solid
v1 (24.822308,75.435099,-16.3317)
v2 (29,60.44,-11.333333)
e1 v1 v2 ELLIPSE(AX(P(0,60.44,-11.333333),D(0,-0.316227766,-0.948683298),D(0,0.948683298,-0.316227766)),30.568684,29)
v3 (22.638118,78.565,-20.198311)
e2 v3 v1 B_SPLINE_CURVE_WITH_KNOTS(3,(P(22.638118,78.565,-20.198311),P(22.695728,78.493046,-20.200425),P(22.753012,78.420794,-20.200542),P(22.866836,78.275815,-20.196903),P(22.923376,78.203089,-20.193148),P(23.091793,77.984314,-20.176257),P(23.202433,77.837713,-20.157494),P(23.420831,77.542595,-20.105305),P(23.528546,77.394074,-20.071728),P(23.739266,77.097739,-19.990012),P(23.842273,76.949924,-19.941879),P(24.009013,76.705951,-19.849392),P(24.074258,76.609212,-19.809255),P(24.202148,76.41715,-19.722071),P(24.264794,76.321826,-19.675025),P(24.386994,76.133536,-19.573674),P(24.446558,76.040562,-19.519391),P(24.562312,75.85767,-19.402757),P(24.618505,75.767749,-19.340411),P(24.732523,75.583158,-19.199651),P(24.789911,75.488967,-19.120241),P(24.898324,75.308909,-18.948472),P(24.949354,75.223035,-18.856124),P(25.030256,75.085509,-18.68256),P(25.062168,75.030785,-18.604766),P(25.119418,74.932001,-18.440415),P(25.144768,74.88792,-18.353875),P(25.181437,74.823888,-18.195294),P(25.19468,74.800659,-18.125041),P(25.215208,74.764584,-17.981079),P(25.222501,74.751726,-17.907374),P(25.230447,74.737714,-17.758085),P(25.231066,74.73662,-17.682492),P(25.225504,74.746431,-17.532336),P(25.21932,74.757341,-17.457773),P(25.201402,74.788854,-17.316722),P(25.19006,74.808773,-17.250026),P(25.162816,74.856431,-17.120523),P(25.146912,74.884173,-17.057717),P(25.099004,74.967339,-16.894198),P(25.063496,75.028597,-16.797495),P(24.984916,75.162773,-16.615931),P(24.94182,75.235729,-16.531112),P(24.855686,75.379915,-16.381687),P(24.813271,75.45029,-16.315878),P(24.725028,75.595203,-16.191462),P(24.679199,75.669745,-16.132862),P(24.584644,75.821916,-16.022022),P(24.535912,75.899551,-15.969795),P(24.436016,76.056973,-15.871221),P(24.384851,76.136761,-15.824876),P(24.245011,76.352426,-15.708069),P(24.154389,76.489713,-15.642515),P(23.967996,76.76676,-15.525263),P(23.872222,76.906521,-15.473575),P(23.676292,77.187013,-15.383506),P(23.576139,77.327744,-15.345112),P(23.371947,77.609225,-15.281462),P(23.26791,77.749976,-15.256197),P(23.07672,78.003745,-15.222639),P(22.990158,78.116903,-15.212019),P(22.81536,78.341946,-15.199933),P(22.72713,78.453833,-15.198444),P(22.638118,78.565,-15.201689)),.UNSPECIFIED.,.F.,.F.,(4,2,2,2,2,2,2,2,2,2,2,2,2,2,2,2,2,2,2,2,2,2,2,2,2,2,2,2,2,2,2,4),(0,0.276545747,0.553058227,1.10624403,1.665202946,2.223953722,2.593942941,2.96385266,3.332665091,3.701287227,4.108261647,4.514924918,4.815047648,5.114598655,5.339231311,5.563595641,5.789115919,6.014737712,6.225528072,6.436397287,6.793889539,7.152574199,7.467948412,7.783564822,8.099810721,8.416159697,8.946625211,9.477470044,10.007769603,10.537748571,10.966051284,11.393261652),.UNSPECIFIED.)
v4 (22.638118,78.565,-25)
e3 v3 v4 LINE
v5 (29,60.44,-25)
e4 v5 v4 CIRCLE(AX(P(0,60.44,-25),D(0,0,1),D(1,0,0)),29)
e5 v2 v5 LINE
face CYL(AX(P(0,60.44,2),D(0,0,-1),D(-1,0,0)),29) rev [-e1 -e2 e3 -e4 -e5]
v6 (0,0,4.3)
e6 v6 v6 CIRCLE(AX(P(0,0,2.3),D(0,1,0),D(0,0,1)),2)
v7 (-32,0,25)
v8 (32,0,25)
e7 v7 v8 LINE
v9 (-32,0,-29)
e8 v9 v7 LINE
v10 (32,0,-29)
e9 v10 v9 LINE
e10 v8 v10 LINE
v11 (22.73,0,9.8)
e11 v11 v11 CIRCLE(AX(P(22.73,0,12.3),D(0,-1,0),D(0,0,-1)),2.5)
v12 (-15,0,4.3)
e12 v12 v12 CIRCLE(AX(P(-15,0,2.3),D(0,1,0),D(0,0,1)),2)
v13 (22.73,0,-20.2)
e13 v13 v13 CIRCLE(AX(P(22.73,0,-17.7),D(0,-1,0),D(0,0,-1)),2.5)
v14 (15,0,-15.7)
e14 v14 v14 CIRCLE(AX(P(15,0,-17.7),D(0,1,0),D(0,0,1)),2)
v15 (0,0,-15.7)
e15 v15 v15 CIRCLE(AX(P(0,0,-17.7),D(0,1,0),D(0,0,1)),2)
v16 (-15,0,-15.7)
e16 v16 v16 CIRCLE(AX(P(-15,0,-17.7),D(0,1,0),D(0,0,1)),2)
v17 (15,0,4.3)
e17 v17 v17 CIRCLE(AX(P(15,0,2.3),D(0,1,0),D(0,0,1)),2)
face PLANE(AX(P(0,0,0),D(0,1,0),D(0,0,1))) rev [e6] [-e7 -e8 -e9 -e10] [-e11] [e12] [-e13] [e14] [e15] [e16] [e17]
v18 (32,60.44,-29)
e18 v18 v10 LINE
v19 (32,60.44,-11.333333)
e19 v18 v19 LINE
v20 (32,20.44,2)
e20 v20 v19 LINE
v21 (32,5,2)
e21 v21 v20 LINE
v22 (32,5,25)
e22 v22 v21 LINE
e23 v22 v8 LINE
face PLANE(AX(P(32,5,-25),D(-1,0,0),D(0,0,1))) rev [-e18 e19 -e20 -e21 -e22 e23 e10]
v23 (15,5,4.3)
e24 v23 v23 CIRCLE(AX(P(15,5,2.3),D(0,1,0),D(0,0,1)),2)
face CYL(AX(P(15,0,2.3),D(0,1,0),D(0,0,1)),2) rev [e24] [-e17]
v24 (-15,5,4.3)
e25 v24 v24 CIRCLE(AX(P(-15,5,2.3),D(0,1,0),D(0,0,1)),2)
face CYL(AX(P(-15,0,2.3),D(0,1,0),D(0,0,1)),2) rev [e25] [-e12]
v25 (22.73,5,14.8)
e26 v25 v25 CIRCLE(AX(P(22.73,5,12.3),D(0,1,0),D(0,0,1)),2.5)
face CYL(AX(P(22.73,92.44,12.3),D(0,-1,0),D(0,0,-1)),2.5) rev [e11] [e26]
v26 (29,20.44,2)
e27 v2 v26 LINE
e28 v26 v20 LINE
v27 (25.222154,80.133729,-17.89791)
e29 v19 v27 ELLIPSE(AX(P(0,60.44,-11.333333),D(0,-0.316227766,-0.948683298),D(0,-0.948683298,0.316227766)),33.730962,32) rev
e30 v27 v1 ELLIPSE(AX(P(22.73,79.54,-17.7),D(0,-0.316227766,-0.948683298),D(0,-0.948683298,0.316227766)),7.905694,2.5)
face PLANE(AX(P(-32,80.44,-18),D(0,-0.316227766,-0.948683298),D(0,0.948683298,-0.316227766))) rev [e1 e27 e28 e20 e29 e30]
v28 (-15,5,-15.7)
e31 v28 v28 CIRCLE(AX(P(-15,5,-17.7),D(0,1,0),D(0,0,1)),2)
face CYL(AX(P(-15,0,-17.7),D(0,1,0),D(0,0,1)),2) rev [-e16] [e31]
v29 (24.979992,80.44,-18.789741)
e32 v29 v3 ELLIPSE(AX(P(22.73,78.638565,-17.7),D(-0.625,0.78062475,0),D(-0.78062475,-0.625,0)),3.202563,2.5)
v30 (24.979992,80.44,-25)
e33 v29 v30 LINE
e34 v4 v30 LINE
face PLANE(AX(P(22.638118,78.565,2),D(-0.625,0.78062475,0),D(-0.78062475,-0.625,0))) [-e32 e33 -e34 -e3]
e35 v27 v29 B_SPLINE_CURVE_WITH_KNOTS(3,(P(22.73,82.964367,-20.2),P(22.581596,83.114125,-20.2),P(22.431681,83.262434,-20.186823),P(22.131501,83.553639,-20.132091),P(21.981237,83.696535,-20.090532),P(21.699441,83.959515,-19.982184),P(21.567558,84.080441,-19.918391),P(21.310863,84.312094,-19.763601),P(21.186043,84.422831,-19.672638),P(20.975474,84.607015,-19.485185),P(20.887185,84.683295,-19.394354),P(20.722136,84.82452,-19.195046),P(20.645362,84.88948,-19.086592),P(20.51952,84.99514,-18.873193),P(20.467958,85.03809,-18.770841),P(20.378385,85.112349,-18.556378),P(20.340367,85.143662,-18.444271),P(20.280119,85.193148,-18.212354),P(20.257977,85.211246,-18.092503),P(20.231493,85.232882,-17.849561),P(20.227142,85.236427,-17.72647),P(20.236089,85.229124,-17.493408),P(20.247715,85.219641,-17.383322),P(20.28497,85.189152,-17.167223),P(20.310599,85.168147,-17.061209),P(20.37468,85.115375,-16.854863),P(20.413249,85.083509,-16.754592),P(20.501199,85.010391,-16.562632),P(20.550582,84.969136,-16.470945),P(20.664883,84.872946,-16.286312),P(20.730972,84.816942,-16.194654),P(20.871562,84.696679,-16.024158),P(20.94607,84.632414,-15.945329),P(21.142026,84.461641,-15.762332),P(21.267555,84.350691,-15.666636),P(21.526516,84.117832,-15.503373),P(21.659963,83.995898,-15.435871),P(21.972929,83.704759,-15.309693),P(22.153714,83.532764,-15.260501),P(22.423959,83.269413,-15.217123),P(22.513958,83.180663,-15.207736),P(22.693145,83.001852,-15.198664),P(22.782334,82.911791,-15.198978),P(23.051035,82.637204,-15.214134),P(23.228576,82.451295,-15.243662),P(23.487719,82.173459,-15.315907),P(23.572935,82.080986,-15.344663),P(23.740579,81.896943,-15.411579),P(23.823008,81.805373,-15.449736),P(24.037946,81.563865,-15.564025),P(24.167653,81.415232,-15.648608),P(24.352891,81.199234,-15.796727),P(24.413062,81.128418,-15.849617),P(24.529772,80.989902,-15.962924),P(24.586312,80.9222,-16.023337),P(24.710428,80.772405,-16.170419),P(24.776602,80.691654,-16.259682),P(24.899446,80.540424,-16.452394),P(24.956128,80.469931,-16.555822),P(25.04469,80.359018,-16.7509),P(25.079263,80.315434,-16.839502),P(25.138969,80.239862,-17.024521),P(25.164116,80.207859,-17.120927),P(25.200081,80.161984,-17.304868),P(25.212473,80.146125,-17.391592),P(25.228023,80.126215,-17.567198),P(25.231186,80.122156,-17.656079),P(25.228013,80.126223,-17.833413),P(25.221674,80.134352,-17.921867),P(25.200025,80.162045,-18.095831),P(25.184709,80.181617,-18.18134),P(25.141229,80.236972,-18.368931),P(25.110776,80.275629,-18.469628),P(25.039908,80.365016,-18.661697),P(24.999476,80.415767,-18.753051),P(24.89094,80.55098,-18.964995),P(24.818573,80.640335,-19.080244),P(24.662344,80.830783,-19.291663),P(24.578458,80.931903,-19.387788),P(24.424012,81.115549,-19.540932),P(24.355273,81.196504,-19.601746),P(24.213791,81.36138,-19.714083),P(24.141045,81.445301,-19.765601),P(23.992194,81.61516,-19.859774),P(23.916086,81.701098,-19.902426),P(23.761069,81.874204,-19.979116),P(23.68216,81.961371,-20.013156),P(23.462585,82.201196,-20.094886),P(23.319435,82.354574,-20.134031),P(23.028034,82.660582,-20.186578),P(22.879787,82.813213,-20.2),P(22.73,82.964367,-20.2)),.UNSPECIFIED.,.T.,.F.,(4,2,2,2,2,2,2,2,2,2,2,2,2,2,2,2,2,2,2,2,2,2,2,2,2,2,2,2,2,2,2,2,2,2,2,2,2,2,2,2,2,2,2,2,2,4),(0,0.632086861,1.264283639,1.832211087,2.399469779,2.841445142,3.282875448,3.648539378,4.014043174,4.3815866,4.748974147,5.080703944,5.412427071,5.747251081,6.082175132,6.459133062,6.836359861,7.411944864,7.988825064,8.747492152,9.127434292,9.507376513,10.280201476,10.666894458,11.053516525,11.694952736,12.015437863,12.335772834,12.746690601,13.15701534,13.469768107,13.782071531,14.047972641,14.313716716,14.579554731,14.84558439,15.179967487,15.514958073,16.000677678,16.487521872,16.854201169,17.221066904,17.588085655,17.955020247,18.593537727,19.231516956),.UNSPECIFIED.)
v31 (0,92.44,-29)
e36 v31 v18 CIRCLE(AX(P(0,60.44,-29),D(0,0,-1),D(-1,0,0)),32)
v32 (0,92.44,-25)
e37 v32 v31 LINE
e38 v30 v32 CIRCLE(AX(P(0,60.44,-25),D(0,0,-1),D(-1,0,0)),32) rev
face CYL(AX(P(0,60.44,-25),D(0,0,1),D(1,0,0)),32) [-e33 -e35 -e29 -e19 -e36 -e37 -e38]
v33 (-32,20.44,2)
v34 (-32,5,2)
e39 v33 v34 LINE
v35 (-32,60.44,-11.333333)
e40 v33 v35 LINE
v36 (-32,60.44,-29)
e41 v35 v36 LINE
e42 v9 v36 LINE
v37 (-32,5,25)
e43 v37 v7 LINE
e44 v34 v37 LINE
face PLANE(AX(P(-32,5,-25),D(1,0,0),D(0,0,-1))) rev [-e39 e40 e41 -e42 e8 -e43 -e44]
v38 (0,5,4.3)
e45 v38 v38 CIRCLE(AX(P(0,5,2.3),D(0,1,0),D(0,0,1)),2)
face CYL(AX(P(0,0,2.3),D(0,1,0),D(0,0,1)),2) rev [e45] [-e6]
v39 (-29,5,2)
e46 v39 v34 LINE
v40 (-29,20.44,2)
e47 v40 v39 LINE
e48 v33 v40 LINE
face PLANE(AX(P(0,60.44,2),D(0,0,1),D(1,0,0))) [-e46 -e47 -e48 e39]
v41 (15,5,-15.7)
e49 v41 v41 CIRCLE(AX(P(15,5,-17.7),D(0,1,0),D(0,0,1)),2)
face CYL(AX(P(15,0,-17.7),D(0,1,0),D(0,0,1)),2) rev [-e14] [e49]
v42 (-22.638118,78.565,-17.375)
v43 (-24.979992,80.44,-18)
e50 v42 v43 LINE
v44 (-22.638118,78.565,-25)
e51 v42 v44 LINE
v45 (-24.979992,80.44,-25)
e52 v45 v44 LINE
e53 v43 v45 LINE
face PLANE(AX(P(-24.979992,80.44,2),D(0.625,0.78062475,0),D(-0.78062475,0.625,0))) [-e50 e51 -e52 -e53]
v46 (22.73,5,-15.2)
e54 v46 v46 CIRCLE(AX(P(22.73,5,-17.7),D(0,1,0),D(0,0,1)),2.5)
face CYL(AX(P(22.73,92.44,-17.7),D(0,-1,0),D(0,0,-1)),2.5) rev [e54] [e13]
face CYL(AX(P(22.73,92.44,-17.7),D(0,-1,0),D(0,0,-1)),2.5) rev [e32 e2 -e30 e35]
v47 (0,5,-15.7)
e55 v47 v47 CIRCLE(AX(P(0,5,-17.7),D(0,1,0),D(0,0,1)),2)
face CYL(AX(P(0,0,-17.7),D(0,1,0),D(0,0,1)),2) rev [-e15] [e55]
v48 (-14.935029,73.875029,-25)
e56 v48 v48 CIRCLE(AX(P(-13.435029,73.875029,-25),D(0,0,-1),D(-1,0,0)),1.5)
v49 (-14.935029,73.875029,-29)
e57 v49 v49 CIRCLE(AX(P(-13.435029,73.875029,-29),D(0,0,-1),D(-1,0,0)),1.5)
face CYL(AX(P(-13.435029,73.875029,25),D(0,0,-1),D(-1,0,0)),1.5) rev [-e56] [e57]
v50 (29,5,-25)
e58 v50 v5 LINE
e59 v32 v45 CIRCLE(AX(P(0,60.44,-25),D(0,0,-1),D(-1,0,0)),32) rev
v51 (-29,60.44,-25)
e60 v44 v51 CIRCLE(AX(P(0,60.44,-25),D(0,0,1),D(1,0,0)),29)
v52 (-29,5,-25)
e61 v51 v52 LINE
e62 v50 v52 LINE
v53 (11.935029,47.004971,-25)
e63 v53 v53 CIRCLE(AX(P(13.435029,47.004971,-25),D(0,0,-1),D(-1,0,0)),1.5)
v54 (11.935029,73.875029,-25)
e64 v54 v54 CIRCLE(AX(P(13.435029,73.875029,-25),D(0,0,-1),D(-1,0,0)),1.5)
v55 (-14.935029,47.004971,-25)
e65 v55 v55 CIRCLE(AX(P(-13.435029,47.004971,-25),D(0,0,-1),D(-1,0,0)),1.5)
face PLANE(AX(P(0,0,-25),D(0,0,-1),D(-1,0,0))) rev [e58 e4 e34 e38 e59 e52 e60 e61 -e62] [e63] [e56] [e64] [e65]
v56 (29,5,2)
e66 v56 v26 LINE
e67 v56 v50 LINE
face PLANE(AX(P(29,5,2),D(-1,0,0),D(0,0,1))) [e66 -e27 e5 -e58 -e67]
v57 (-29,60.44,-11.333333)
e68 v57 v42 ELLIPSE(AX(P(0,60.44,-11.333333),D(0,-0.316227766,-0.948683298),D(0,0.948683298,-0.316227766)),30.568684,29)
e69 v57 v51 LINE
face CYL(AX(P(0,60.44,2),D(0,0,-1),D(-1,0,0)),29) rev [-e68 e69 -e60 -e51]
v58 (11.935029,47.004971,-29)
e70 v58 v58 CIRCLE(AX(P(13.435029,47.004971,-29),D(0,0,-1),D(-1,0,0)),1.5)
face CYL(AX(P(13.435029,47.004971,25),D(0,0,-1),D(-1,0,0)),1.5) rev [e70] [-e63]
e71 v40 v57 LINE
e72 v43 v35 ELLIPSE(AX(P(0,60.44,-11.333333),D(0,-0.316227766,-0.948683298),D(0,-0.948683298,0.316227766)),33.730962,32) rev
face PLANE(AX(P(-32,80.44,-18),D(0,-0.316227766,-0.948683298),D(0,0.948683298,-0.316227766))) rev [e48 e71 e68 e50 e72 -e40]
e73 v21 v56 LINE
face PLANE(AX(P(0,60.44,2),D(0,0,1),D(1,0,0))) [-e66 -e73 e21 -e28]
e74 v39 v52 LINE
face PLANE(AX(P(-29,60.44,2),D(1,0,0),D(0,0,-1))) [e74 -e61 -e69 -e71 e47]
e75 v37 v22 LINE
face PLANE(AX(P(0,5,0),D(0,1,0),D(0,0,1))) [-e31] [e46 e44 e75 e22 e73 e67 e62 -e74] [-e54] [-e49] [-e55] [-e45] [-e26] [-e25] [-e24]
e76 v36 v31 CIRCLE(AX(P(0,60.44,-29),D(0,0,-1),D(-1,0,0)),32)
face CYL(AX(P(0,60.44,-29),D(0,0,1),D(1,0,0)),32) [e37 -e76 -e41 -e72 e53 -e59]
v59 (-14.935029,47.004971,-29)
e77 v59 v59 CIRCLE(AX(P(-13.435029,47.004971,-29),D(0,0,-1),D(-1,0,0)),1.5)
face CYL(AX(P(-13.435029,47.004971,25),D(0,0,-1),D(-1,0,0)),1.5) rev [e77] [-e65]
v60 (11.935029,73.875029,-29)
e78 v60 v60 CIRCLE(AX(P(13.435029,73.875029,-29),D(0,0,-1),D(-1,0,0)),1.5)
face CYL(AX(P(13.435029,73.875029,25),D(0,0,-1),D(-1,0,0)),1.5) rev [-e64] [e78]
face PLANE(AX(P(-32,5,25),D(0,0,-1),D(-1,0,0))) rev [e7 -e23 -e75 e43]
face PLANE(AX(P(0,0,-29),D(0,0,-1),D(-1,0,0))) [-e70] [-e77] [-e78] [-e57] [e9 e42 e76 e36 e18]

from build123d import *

# Parameters (mm, degrees)
SKETCH_2_W          = 64
SKETCH_2_H          = 50
EXTRUDE_1_DEPTH     = 5
SKETCH_3_W          = 64
SKETCH_3_H          = 92.44
EXTRUDE_2_DEPTH     = 4
SKETCH_5_R          = 1.5
CUT_EXTRUDE_1_DEPTH = 112.736984029
FILLET_1_R          = 32
SKETCH_6_R          = 2
CUT_EXTRUDE_2_DEPTH = 98.52309265
EXTRUDE_1_2_DEPTH   = 27
CUT_EXTRUDE_3_DEPTH = 117.112676311
SKETCH_10_R         = 2.5
CUT_EXTRUDE_4_DEPTH = 103.030160247


with BuildPart() as part:
    # 草图2 → Extrude 1 (new body)
    with BuildSketch(Plane(origin=(0, 0, 0), x_dir=(1, 0, 0), z_dir=(0, 1, 0))):
        Rectangle(SKETCH_2_W, SKETCH_2_H)
    extrude(amount=EXTRUDE_1_DEPTH)

    # 草图3 → 凸台-拉伸2 (add)
    with BuildSketch(Plane(origin=(0, 0, -25), x_dir=(-1, 0, 0), z_dir=(0, 0, -1))):
        with Locations((0, 46.22)):
            Rectangle(SKETCH_3_W, SKETCH_3_H)
    extrude(amount=EXTRUDE_2_DEPTH)

    # 草图5 → 切除-拉伸1 (cut, through all)
    with BuildSketch(Plane(origin=(0, 0, -29), x_dir=(-1, 0, 0), z_dir=(0, 0, -1))):
        with Locations((-13.435028843, 73.875028843)):
            Circle(SKETCH_5_R)
        with Locations((13.435028843, 73.875028843)):
            Circle(SKETCH_5_R)
        with Locations((13.435028843, 47.004971157)):
            Circle(SKETCH_5_R)
        with Locations((-13.435028843, 47.004971157)):
            Circle(SKETCH_5_R)
    extrude(amount=-CUT_EXTRUDE_1_DEPTH, mode=Mode.SUBTRACT)

    # 圆角1
    fillet_1_edges = [part.edges().sort_by_distance(p)[0] for p in [
        (-32, 92.44, -27),
        (32, 92.44, -27),
    ]]
    fillet(fillet_1_edges, radius=FILLET_1_R - 0.0001)  # a hair under: the kernel refuses the full size

    # 草图6 → 切除-拉伸2 (cut, through all)
    with BuildSketch(Plane(origin=(0, 5, 0), x_dir=(1, 0, 0), z_dir=(0, 1, 0))):
        with Locations(Location((-15, 17.7, 0), (0, 0, 270))):
            Circle(SKETCH_6_R)
        with Locations(Location((15, 17.7, 0), (0, 0, 270))):
            Circle(SKETCH_6_R)
        with Locations(Location((0, 17.7, 0), (0, 0, 270))):
            Circle(SKETCH_6_R)
        with Locations(Location((-15, -2.3, 0), (0, 0, 270))):
            Circle(SKETCH_6_R)
        with Locations(Location((0, -2.3, 0), (0, 0, 270))):
            Circle(SKETCH_6_R)
        with Locations(Location((15, -2.3, 0), (0, 0, 270))):
            Circle(SKETCH_6_R)
    extrude(amount=-CUT_EXTRUDE_2_DEPTH, mode=Mode.SUBTRACT)

    # 草图8 → Extrude 1 2 (add)
    with BuildSketch(Plane.XY.offset(-25)):
        with BuildLine():
            ThreePointArc((-24.979991994, 80.44), (-30.194037026, 71.038119083), (-32, 60.44))
            Line((-32, 60.44), (-32, 5))
            Line((-32, 5), (-29, 5))
            Line((-29, 5), (-29, 60.44))
            ThreePointArc((-29, 60.44), (-27.363346054, 70.044545419), (-22.638117744, 78.565))
            Line((-22.638117744, 78.565), (-24.979991994, 80.44))
        make_face()
        with BuildLine():
            Line((32, 5), (32, 60.44))
            ThreePointArc((32, 60.44), (30.194037026, 71.038119083), (24.979991994, 80.44))
            Line((24.979991994, 80.44), (22.638117744, 78.565))
            ThreePointArc((22.638117744, 78.565), (27.363346054, 70.044545419), (29, 60.44))
            Line((29, 60.44), (29, 5))
            Line((29, 5), (32, 5))
        make_face()
    extrude(amount=EXTRUDE_1_2_DEPTH)

    # 草图9 → 切除-拉伸3 (cut, through all)
    with BuildSketch(Plane(origin=(32, 0, 0), x_dir=(0, 0, -1), z_dir=(1, 0, 0))):
        Polygon((18, 80.44), (-2, 20.44), (-2, 80.44), align=None)
    extrude(amount=-CUT_EXTRUDE_3_DEPTH, mode=Mode.SUBTRACT)

    # 草图10 → 切除-拉伸4 (cut, through all)
    with BuildSketch(Plane.XZ):
        with Locations(Location((22.73, -17.7, 0), (0, 0, 270))):
            Circle(SKETCH_10_R)
        with Locations(Location((22.73, 12.3, 0), (0, 0, 270))):
            Circle(SKETCH_10_R)
    extrude(amount=-CUT_EXTRUDE_4_DEPTH, mode=Mode.SUBTRACT)


solid = part.part
